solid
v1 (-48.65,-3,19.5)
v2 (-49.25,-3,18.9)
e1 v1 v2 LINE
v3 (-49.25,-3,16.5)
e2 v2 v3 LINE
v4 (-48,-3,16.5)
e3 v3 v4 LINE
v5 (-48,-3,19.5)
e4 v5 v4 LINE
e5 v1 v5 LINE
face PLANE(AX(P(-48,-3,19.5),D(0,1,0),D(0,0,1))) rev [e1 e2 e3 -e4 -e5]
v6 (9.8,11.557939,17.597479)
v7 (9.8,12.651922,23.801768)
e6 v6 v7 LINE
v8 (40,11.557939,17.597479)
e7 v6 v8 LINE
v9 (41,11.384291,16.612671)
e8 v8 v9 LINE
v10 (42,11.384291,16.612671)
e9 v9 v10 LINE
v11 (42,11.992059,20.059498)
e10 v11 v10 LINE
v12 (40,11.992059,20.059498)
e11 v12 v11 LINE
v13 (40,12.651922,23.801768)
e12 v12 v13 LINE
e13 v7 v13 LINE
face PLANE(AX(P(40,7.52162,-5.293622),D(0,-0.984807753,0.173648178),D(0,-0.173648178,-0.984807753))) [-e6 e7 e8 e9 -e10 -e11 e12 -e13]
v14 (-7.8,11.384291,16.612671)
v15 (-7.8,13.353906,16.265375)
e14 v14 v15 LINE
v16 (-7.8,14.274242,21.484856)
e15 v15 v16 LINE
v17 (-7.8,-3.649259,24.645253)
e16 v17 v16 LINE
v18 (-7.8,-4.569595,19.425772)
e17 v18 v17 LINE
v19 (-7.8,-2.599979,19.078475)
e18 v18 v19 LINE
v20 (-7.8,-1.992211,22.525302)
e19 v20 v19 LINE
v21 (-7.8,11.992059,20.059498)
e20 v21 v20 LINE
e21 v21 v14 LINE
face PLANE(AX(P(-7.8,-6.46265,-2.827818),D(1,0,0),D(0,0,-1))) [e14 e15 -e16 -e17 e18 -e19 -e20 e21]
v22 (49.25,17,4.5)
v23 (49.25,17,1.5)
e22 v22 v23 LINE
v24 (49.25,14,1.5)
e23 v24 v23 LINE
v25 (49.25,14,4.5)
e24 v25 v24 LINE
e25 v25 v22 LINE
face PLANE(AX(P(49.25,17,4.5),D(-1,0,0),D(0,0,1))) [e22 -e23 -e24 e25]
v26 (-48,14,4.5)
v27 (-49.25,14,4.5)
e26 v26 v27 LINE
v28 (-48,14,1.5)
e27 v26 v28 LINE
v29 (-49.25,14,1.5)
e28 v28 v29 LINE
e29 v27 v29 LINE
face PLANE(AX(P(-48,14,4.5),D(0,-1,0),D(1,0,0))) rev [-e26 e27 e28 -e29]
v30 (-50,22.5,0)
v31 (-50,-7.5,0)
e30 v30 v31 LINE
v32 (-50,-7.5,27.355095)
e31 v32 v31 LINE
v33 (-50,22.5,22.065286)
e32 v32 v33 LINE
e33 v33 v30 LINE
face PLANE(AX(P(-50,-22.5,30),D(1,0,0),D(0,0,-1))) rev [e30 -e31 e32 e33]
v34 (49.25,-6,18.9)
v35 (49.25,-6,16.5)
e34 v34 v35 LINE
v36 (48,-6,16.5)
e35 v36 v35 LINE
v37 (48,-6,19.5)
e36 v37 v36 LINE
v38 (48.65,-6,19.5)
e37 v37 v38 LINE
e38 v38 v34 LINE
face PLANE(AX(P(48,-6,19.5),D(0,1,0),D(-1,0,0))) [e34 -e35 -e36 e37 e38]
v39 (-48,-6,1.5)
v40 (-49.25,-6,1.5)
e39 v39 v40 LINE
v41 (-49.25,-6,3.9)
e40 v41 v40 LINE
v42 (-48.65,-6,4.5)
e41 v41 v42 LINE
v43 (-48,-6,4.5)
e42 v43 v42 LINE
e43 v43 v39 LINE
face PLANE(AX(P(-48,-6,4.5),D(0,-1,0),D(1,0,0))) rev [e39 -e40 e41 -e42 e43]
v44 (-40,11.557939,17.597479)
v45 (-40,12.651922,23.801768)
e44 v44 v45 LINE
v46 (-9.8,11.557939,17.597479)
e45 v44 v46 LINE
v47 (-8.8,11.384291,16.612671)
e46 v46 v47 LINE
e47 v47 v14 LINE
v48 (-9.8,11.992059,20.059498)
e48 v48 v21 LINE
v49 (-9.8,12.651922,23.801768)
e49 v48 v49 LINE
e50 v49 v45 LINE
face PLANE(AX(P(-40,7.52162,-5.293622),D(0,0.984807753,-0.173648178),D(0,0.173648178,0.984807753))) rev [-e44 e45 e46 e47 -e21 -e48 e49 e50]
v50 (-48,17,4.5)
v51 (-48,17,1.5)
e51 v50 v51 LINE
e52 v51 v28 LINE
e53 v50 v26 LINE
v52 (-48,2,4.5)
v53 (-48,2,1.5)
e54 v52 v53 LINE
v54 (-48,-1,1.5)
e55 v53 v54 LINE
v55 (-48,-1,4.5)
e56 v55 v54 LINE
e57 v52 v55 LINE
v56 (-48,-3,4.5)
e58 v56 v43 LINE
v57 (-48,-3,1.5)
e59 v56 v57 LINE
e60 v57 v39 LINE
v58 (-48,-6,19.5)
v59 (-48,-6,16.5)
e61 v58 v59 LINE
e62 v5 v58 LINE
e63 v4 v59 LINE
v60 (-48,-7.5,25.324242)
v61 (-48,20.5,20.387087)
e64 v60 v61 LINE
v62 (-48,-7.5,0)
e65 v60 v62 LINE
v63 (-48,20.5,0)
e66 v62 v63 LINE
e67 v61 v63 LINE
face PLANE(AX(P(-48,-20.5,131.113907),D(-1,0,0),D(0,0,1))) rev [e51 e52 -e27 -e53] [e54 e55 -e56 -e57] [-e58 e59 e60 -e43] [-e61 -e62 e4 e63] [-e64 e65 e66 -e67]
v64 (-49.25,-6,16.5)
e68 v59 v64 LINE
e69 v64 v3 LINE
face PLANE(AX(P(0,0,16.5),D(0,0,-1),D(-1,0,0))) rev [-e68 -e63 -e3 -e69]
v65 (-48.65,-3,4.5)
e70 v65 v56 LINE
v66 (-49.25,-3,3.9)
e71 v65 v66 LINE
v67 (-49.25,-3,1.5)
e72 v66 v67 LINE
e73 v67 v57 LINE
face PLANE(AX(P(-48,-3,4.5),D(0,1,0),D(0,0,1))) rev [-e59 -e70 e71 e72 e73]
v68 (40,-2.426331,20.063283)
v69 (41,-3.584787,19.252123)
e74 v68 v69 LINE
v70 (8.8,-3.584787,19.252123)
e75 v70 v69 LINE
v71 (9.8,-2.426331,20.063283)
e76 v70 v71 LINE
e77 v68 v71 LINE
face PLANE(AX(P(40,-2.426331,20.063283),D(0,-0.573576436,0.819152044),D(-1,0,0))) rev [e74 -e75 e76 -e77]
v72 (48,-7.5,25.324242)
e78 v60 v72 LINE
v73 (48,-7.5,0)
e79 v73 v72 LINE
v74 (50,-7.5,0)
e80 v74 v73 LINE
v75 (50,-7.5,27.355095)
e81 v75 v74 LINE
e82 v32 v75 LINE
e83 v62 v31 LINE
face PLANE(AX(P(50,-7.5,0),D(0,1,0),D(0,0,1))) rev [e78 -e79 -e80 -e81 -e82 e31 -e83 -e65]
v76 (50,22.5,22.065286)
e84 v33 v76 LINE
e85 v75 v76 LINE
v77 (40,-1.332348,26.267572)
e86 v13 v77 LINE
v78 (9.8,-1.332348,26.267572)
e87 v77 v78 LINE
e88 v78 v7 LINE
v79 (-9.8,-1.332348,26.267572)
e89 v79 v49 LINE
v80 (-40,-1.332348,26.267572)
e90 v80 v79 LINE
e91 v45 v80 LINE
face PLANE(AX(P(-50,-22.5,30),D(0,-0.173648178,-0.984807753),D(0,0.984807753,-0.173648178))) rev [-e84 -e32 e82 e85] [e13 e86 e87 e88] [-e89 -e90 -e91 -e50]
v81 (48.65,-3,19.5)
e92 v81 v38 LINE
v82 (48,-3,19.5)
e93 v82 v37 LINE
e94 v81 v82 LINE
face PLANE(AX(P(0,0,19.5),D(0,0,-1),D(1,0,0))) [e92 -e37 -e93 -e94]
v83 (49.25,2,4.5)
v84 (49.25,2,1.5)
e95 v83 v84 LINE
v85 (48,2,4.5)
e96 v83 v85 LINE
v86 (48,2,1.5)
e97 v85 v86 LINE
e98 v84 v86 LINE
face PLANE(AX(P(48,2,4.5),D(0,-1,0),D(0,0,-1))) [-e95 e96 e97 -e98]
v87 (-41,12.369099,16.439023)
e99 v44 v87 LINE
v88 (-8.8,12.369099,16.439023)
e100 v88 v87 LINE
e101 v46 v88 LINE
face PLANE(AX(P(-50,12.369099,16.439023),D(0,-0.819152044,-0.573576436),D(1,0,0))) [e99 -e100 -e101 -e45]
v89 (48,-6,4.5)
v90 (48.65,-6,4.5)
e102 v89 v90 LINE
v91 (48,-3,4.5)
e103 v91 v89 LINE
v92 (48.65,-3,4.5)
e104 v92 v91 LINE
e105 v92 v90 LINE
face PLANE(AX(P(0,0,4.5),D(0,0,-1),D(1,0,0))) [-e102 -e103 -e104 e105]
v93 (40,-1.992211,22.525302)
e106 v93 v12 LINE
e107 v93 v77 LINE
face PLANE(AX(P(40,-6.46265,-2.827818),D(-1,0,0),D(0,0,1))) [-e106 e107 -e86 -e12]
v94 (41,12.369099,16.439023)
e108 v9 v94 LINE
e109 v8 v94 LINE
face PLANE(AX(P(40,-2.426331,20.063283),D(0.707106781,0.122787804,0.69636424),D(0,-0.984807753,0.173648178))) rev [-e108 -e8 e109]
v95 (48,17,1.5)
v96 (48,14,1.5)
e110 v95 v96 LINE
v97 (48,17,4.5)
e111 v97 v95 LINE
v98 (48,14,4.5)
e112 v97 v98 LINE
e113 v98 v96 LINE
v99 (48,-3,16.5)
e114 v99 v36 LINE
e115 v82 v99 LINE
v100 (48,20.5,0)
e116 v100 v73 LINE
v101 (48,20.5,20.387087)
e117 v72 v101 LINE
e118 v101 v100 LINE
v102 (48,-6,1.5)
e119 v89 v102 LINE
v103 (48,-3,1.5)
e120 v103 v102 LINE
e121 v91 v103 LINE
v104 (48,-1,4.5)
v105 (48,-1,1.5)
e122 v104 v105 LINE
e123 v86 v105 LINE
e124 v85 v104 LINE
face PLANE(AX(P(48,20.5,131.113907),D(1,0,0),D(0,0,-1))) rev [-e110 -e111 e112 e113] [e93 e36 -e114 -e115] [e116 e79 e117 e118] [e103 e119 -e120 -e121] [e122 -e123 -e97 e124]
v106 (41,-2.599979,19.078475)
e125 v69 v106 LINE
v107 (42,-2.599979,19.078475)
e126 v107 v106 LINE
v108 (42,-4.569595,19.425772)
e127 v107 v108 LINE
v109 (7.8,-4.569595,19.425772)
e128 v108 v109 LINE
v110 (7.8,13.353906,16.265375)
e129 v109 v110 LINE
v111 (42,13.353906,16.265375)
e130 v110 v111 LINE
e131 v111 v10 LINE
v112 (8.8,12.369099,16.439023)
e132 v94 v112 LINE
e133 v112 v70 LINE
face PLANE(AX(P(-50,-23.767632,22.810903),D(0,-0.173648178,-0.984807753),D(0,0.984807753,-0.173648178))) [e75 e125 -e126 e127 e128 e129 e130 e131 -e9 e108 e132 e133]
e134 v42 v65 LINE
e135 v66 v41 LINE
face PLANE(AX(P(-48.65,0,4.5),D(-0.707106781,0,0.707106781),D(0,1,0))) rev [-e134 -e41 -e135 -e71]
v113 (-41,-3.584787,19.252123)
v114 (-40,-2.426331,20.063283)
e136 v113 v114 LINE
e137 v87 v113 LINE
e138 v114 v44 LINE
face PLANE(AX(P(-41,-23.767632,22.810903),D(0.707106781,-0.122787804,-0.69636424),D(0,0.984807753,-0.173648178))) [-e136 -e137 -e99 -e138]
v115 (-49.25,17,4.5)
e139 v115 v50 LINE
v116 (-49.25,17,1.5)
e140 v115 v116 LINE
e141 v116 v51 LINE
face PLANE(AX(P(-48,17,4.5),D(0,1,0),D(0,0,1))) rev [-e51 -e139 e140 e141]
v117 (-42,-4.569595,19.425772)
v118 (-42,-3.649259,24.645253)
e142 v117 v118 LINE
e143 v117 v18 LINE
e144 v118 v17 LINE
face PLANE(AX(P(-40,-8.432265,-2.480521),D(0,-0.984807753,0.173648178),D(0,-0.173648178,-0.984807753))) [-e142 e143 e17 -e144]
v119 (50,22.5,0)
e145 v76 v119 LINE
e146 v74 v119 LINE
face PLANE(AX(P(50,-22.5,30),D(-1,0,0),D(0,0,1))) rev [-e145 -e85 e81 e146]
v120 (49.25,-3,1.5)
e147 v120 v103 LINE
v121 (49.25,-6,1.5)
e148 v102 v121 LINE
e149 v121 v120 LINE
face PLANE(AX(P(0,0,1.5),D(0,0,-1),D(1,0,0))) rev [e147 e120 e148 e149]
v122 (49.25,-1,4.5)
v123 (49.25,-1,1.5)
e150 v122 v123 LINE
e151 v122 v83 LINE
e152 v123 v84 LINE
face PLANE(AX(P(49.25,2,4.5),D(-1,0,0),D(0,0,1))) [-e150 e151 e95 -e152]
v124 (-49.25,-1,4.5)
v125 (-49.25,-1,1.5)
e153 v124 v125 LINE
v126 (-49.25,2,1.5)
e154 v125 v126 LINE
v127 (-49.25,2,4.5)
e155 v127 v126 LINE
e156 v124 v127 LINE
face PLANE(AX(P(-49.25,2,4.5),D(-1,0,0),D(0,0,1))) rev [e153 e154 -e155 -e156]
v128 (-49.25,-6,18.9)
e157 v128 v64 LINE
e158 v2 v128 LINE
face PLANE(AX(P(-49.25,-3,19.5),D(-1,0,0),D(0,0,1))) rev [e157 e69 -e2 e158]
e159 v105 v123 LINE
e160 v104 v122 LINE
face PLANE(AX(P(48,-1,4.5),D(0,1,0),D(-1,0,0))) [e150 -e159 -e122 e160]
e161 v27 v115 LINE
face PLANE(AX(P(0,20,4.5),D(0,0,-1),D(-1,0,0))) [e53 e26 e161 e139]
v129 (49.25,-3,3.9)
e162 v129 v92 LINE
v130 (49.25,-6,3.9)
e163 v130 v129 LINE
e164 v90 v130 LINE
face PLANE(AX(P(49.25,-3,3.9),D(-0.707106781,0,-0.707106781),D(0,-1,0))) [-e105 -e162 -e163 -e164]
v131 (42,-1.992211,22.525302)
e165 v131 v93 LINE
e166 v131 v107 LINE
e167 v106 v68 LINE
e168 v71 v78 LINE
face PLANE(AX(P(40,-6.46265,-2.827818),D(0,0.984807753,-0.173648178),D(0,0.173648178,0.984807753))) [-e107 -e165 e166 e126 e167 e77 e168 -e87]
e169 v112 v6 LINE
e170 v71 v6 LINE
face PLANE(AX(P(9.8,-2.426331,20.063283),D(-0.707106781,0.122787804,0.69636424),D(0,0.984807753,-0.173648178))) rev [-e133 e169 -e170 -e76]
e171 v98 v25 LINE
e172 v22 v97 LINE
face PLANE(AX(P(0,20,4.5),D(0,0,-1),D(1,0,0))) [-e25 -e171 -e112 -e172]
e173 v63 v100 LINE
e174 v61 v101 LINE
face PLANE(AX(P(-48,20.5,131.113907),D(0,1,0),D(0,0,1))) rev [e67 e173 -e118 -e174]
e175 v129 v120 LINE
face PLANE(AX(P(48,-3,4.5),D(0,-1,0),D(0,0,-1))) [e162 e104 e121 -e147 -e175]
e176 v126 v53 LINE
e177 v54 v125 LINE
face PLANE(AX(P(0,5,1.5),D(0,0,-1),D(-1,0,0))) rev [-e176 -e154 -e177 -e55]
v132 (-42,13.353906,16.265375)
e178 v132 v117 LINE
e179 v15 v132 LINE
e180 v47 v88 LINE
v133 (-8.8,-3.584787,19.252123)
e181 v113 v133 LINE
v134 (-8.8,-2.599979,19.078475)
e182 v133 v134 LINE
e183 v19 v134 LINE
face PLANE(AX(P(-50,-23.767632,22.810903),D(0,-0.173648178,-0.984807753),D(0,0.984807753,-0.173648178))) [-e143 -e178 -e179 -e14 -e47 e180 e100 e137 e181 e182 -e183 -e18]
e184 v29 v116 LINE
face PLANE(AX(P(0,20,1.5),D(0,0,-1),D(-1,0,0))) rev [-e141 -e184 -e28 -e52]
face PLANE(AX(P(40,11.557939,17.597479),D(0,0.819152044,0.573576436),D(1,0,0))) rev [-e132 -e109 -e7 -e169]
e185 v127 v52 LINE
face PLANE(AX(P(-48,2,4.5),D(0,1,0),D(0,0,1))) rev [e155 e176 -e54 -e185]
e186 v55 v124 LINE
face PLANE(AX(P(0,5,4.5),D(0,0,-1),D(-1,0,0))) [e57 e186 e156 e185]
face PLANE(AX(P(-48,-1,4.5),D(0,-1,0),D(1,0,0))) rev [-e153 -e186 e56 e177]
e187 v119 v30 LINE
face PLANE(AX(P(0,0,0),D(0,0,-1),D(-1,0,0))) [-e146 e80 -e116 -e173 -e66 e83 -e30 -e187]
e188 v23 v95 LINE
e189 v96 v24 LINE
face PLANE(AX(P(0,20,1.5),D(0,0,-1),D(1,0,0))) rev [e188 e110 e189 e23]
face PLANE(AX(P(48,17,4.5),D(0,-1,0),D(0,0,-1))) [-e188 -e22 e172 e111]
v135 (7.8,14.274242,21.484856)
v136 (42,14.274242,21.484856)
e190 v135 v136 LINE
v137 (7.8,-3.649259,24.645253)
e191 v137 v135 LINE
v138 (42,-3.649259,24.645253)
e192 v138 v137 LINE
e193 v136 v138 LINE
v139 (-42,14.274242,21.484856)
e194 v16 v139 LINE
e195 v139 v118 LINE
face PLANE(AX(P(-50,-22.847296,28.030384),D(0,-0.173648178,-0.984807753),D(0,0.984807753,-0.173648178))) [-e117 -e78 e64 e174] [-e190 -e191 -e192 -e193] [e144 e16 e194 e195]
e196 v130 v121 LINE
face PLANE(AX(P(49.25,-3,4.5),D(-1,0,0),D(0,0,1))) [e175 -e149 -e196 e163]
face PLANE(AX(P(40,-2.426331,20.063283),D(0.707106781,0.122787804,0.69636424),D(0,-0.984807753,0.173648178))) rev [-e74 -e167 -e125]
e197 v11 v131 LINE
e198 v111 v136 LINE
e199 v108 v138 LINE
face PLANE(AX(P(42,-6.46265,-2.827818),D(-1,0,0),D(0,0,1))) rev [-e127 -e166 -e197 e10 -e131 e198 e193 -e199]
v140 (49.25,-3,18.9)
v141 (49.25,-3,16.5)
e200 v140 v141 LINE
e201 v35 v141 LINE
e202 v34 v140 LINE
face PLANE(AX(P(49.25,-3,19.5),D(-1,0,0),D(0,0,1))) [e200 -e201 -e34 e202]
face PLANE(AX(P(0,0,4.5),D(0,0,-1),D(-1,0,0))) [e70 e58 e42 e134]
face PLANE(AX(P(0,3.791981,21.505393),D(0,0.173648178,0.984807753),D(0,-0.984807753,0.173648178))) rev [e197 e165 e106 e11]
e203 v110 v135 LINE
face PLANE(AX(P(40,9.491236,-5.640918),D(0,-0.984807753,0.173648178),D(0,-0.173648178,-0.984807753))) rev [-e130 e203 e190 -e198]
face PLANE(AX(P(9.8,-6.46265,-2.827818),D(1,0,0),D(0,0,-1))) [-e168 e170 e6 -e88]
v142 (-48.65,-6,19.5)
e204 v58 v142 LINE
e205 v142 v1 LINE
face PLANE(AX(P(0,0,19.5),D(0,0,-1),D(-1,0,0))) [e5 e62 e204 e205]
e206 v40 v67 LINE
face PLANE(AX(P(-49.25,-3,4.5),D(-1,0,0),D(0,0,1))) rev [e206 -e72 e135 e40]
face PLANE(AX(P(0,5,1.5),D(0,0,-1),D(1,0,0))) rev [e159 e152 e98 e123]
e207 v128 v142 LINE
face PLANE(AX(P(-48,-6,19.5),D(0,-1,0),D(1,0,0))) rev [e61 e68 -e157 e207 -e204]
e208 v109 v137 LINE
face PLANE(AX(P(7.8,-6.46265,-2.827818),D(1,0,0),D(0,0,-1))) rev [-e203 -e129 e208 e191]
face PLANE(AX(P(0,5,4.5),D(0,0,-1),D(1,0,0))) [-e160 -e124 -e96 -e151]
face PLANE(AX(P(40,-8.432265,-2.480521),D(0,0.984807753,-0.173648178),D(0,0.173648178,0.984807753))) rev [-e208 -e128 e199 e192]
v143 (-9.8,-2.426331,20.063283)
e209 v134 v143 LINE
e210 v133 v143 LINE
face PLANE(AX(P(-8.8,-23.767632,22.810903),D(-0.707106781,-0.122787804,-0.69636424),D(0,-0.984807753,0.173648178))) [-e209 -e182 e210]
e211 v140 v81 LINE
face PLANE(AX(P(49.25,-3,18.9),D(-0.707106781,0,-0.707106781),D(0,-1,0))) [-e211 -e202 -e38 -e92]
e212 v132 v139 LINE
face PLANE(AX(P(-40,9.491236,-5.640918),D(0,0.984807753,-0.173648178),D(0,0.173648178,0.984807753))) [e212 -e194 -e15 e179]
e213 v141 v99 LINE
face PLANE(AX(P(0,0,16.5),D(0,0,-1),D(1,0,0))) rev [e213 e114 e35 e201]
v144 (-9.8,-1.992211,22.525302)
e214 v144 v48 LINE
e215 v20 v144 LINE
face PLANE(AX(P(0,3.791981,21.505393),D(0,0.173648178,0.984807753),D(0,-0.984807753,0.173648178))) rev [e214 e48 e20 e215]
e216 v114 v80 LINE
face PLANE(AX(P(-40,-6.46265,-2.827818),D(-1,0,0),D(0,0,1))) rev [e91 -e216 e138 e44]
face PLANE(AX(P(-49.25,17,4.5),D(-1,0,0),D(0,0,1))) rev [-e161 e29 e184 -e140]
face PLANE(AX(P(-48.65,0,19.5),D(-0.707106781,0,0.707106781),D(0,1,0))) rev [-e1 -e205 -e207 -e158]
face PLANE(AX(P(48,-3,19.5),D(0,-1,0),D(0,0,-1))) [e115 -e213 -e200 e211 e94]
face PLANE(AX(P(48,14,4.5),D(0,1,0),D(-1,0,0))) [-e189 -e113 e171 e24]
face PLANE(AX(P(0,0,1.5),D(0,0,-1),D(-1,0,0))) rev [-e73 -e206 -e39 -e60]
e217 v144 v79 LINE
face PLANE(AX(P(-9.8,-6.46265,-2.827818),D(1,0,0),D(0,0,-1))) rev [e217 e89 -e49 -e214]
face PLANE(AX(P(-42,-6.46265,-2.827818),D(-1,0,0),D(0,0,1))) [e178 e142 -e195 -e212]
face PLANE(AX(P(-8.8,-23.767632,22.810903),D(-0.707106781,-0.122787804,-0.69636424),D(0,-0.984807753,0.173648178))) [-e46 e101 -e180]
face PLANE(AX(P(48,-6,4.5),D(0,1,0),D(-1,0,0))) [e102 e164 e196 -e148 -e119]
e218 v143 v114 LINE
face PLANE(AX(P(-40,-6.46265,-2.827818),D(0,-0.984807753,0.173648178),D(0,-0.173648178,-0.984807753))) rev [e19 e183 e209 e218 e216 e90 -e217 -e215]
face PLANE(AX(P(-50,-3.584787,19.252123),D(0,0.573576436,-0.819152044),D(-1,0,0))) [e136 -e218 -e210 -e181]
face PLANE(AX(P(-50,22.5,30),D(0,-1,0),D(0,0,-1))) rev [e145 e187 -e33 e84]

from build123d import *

# Parameters (mm, degrees)
SKETCH1_W               = 100
SKETCH1_H               = 45
BOSS_EXTRUDE1_DEPTH     = 30
CUT_EXTRUDE5_DEPTH      = 107.800046816
SKETCH2_W               = 30.2
SKETCH2_H               = 14.2
CUT_EXTRUDE1_DEPTH      = 61.848905169
CUT_EXTRUDE6_REACH      = 64.5
SKETCH9_W               = 96
SKETCH9_H               = 41
SHELL2_START            = -48
SHELL2_DEPTH            = 96
SHELL2_START_2          = -7.8
SHELL2_2_DEPTH          = 15.6
SHELL2_3_DEPTH          = 6
SHELL2_START_3          = 42
SHELL2_4_DEPTH          = 6
SKETCH10_W              = 96
SKETCH10_H              = 2
CUT_EXTRUDE7_DEPTH      = 2
CUT_EXTRUDE9_START      = -1.5
SKETCH12_W              = 1.25
SKETCH12_H              = 3
CUT_EXTRUDE9_DEPTH      = 3
LPATTERN2_COUNT         = 2
LPATTERN2_PITCH         = 15
LPATTERN3_COUNT         = 2
LPATTERN3_PITCH         = 5
LPATTERN4_COUNT         = 2
LPATTERN4_PITCH         = 20
MIRROR7_START           = -1.5
MIRROR7_COPY_1_SKETCH_W = 1.25
MIRROR7_COPY_1_SKETCH_H = 3
MIRROR7_COPY_1_DEPTH    = 3
MIRROR7_COPY_2_SKETCH_W = 1.25
MIRROR7_COPY_2_SKETCH_H = 3
MIRROR7_COPY_2_DEPTH    = 3
MIRROR7_COPY_3_SKETCH_W = 1.25
MIRROR7_COPY_3_SKETCH_H = 3
MIRROR7_COPY_3_DEPTH    = 3
CHAMFER4_SIZE           = 1
SKETCH13_W              = 30
SKETCH13_H              = 15
CUT_EXTRUDE10_DEPTH     = 107.800046816
CHAMFER5_SIZE           = 0.6
SKETCH14_W              = 2
SKETCH14_H              = 14.2
CUT_EXTRUDE11_DEPTH     = 3.5


# Read off the part's stored shape, not the designer's step: Shell2
with BuildPart() as part:
    # Sketch1 → Boss-Extrude1 (new body)
    with BuildSketch(Plane.XY):
        Rectangle(SKETCH1_W, SKETCH1_H)
    extrude(amount=BOSS_EXTRUDE1_DEPTH)

    # Sketch7 → Cut-Extrude5 (cut, through all)
    with BuildSketch(Plane(origin=(50, 0, 0), x_dir=(0, 0, -1), z_dir=(1, 0, 0))):
        Polygon((-30, -22.5), (-22.065285868, 22.5), (-30, 22.5), align=None)
    extrude(amount=-CUT_EXTRUDE5_DEPTH, mode=Mode.SUBTRACT)

    # Sketch2 → Cut-Extrude1 (cut, through all)
    with BuildSketch(Plane(origin=(0, -0.341825557, 26.092916002), x_dir=(1, 0, 0), z_dir=(0, 0.17364817766692325, 0.9848077530122092))):
        with Locations((-24.9, 6.094197535)):
            Rectangle(SKETCH2_W, SKETCH2_H)
    cut_extrude1 = extrude(amount=-CUT_EXTRUDE1_DEPTH, mode=Mode.SUBTRACT)

    # Mirror1: Cut-Extrude1 across plane
    add(cut_extrude1.mirror(Plane(origin=(0, 0, 0), x_dir=(0, 0, 1), z_dir=(1, 0, 0))), mode=Mode.SUBTRACT)

    # Cut-Extrude6: up to this plane
    cut_extrude6_end = Plane(origin=(-50, -23.767631697, 22.810903403), z_dir=(0, -0.17364817766692328, -0.9848077530122092))
    # Sketch9 → Cut-Extrude6 (cut, up to the surface)
    with BuildSketch(Plane(origin=(0, 0, 0), x_dir=(-1, 0, 0), z_dir=(0, 0, -1)), mode=Mode.PRIVATE) as cut_extrude6_sk1:
        Rectangle(SKETCH9_W, SKETCH9_H)
    cut_extrude6_tool1 = split(extrude(cut_extrude6_sk1.sketch, amount=-CUT_EXTRUDE6_REACH, mode=Mode.PRIVATE), bisect_by=cut_extrude6_end, keep=Keep.BOTH, mode=Mode.PRIVATE)
    add(cut_extrude6_tool1.solids().sort_by_distance((0, 0, 0))[0], mode=Mode.SUBTRACT)

    # Shell2 outline → Shell2 (cut)
    with BuildSketch(Plane.YZ.offset(SHELL2_START)):
        Polygon((13.353906279, 16.265374693), (20.5, 15.005325563), (20.5, 20.387086606), (14.274241621, 21.484855784), align=None)
        Polygon((-20.5, 22.234731772), (-4.569594826, 19.425771526), (-3.649259484, 24.645252617), (-22.5, 27.969146776), (-22.5, 2), (-20.5, 2), align=None)
    extrude(amount=SHELL2_DEPTH, mode=Mode.SUBTRACT)

    # Shell2 2 outline → Shell2 2 (cut)
    with BuildSketch(Plane.YZ.offset(SHELL2_START_2)):
        Polygon((-4.569594826, 19.425771526), (13.353906279, 16.265374693), (14.274241621, 21.484855783), (-3.649259484, 24.645252617), align=None)
    extrude(amount=SHELL2_2_DEPTH, mode=Mode.SUBTRACT)

    # Shell2 3 outline → Shell2 3 (cut)
    with BuildSketch(Plane.YZ.offset(SHELL2_START)):
        Polygon((-4.569594826, 19.425771526), (13.353906279, 16.265374693), (14.274241621, 21.484855783), (-3.649259484, 24.645252617), align=None)
    extrude(amount=SHELL2_3_DEPTH, mode=Mode.SUBTRACT)

    # Shell2 4 outline → Shell2 4 (cut)
    with BuildSketch(Plane.YZ.offset(SHELL2_START_3)):
        Polygon((-4.569594826, 19.425771526), (13.353906279, 16.265374693), (14.274241621, 21.484855783), (-3.649259484, 24.645252617), align=None)
    extrude(amount=SHELL2_4_DEPTH, mode=Mode.SUBTRACT)

    # Sketch10 → Cut-Extrude7 (cut)
    with BuildSketch(Plane(origin=(0, 0, 0), x_dir=(-1, 0, 0), z_dir=(0, 0, -1))):
        with Locations((0, -21.5)):
            Rectangle(SKETCH10_W, SKETCH10_H)
    extrude(amount=-CUT_EXTRUDE7_DEPTH, mode=Mode.SUBTRACT)

    # Sketch12 → Cut-Extrude9 (cut)
    with BuildSketch(Plane(origin=(0, 0, 0), x_dir=(-1, 0, 0), z_dir=(0, 0, -1)).offset(CUT_EXTRUDE9_START)):
        with Locations((48.625, -4.5)):
            Rectangle(SKETCH12_W, SKETCH12_H)
    cut_extrude9 = extrude(amount=-CUT_EXTRUDE9_DEPTH, mode=Mode.SUBTRACT)

    # LPattern2: Cut-Extrude9 ×2
    with Locations(*[(0, 0, i * LPATTERN2_PITCH) for i in range(1, LPATTERN2_COUNT)]):
        add(cut_extrude9, mode=Mode.SUBTRACT)

    # LPattern3: Cut-Extrude9 ×2
    with Locations(*[(0, i * LPATTERN3_PITCH, 0) for i in range(1, LPATTERN3_COUNT)]):
        add(cut_extrude9, mode=Mode.SUBTRACT)

    # LPattern4: Cut-Extrude9 ×2
    with Locations(*[(0, i * LPATTERN4_PITCH, 0) for i in range(1, LPATTERN4_COUNT)]):
        add(cut_extrude9, mode=Mode.SUBTRACT)

    # Mirror7: Cut-Extrude9 across plane
    add(cut_extrude9.mirror(Plane(origin=(0, 0, 0), x_dir=(0, 0, 1), z_dir=(1, 0, 0))), mode=Mode.SUBTRACT)

    # Mirror7 copy 1 sketch → Mirror7 copy 1 (cut)
    with BuildSketch(Plane(origin=(0, 0, 15), x_dir=(1, 0, 0), z_dir=(0, 0, -1)).offset(MIRROR7_START)):
        with Locations((48.625, 4.5)):
            Rectangle(MIRROR7_COPY_1_SKETCH_W, MIRROR7_COPY_1_SKETCH_H)
    extrude(amount=-MIRROR7_COPY_1_DEPTH, mode=Mode.SUBTRACT)

    # Mirror7 copy 2 sketch → Mirror7 copy 2 (cut)
    with BuildSketch(Plane(origin=(0, 5, 0), x_dir=(1, 0, 0), z_dir=(0, 0, -1)).offset(MIRROR7_START)):
        with Locations((48.625, 4.5)):
            Rectangle(MIRROR7_COPY_2_SKETCH_W, MIRROR7_COPY_2_SKETCH_H)
    extrude(amount=-MIRROR7_COPY_2_DEPTH, mode=Mode.SUBTRACT)

    # Mirror7 copy 3 sketch → Mirror7 copy 3 (cut)
    with BuildSketch(Plane(origin=(0, 20, 0), x_dir=(1, 0, 0), z_dir=(0, 0, -1)).offset(MIRROR7_START)):
        with Locations((48.625, 4.5)):
            Rectangle(MIRROR7_COPY_3_SKETCH_W, MIRROR7_COPY_3_SKETCH_H)
    extrude(amount=-MIRROR7_COPY_3_DEPTH, mode=Mode.SUBTRACT)

    # Chamfer4
    chamfer4_edges = [part.edges().sort_by_distance(p)[0] for p in [
        (24.9, -2.59997932, 19.078475171),
        (9.8, 4.392155727, 17.845573109),
        (24.9, 11.384290773, 16.612671048),
        (40, 4.392155727, 17.845573109),
        (-24.9, -2.59997932, 19.078475171),
        (-9.8, 4.392155727, 17.845573109),
        (-24.9, 11.384290773, 16.612671048),
        (-40, 4.392155727, 17.845573109),
    ]]
    chamfer(chamfer4_edges, length=CHAMFER4_SIZE)

    # Sketch13 → Cut-Extrude10 (cut, through all)
    with BuildSketch(Plane.ZY.offset(50)):
        with Locations((15, -15)):
            Rectangle(SKETCH13_W, SKETCH13_H)
    extrude(amount=-CUT_EXTRUDE10_DEPTH, mode=Mode.SUBTRACT)

    # Chamfer5
    chamfer5_edges = [part.edges().sort_by_distance(p)[0] for p in [
        (-49.25, -4.5, 4.5),
        (-49.25, -4.5, 19.5),
        (49.25, -4.5, 4.5),
        (49.25, -4.5, 19.5),
    ]]
    chamfer(chamfer5_edges, length=CHAMFER5_SIZE)

    # Sketch14 → Cut-Extrude11 (cut)
    with BuildSketch(Plane(origin=(0, 3.184212437, 18.058566102), x_dir=(-1, 0, 0), z_dir=(0, -0.17364817766692328, -0.9848077530122094))):
        with Locations((8.8, 1.226577762)):
            Rectangle(SKETCH14_W, SKETCH14_H)
        with Locations((-41, 1.226577762)):
            Rectangle(SKETCH14_W, SKETCH14_H)
    extrude(amount=-CUT_EXTRUDE11_DEPTH, mode=Mode.SUBTRACT)


solid = part.part
